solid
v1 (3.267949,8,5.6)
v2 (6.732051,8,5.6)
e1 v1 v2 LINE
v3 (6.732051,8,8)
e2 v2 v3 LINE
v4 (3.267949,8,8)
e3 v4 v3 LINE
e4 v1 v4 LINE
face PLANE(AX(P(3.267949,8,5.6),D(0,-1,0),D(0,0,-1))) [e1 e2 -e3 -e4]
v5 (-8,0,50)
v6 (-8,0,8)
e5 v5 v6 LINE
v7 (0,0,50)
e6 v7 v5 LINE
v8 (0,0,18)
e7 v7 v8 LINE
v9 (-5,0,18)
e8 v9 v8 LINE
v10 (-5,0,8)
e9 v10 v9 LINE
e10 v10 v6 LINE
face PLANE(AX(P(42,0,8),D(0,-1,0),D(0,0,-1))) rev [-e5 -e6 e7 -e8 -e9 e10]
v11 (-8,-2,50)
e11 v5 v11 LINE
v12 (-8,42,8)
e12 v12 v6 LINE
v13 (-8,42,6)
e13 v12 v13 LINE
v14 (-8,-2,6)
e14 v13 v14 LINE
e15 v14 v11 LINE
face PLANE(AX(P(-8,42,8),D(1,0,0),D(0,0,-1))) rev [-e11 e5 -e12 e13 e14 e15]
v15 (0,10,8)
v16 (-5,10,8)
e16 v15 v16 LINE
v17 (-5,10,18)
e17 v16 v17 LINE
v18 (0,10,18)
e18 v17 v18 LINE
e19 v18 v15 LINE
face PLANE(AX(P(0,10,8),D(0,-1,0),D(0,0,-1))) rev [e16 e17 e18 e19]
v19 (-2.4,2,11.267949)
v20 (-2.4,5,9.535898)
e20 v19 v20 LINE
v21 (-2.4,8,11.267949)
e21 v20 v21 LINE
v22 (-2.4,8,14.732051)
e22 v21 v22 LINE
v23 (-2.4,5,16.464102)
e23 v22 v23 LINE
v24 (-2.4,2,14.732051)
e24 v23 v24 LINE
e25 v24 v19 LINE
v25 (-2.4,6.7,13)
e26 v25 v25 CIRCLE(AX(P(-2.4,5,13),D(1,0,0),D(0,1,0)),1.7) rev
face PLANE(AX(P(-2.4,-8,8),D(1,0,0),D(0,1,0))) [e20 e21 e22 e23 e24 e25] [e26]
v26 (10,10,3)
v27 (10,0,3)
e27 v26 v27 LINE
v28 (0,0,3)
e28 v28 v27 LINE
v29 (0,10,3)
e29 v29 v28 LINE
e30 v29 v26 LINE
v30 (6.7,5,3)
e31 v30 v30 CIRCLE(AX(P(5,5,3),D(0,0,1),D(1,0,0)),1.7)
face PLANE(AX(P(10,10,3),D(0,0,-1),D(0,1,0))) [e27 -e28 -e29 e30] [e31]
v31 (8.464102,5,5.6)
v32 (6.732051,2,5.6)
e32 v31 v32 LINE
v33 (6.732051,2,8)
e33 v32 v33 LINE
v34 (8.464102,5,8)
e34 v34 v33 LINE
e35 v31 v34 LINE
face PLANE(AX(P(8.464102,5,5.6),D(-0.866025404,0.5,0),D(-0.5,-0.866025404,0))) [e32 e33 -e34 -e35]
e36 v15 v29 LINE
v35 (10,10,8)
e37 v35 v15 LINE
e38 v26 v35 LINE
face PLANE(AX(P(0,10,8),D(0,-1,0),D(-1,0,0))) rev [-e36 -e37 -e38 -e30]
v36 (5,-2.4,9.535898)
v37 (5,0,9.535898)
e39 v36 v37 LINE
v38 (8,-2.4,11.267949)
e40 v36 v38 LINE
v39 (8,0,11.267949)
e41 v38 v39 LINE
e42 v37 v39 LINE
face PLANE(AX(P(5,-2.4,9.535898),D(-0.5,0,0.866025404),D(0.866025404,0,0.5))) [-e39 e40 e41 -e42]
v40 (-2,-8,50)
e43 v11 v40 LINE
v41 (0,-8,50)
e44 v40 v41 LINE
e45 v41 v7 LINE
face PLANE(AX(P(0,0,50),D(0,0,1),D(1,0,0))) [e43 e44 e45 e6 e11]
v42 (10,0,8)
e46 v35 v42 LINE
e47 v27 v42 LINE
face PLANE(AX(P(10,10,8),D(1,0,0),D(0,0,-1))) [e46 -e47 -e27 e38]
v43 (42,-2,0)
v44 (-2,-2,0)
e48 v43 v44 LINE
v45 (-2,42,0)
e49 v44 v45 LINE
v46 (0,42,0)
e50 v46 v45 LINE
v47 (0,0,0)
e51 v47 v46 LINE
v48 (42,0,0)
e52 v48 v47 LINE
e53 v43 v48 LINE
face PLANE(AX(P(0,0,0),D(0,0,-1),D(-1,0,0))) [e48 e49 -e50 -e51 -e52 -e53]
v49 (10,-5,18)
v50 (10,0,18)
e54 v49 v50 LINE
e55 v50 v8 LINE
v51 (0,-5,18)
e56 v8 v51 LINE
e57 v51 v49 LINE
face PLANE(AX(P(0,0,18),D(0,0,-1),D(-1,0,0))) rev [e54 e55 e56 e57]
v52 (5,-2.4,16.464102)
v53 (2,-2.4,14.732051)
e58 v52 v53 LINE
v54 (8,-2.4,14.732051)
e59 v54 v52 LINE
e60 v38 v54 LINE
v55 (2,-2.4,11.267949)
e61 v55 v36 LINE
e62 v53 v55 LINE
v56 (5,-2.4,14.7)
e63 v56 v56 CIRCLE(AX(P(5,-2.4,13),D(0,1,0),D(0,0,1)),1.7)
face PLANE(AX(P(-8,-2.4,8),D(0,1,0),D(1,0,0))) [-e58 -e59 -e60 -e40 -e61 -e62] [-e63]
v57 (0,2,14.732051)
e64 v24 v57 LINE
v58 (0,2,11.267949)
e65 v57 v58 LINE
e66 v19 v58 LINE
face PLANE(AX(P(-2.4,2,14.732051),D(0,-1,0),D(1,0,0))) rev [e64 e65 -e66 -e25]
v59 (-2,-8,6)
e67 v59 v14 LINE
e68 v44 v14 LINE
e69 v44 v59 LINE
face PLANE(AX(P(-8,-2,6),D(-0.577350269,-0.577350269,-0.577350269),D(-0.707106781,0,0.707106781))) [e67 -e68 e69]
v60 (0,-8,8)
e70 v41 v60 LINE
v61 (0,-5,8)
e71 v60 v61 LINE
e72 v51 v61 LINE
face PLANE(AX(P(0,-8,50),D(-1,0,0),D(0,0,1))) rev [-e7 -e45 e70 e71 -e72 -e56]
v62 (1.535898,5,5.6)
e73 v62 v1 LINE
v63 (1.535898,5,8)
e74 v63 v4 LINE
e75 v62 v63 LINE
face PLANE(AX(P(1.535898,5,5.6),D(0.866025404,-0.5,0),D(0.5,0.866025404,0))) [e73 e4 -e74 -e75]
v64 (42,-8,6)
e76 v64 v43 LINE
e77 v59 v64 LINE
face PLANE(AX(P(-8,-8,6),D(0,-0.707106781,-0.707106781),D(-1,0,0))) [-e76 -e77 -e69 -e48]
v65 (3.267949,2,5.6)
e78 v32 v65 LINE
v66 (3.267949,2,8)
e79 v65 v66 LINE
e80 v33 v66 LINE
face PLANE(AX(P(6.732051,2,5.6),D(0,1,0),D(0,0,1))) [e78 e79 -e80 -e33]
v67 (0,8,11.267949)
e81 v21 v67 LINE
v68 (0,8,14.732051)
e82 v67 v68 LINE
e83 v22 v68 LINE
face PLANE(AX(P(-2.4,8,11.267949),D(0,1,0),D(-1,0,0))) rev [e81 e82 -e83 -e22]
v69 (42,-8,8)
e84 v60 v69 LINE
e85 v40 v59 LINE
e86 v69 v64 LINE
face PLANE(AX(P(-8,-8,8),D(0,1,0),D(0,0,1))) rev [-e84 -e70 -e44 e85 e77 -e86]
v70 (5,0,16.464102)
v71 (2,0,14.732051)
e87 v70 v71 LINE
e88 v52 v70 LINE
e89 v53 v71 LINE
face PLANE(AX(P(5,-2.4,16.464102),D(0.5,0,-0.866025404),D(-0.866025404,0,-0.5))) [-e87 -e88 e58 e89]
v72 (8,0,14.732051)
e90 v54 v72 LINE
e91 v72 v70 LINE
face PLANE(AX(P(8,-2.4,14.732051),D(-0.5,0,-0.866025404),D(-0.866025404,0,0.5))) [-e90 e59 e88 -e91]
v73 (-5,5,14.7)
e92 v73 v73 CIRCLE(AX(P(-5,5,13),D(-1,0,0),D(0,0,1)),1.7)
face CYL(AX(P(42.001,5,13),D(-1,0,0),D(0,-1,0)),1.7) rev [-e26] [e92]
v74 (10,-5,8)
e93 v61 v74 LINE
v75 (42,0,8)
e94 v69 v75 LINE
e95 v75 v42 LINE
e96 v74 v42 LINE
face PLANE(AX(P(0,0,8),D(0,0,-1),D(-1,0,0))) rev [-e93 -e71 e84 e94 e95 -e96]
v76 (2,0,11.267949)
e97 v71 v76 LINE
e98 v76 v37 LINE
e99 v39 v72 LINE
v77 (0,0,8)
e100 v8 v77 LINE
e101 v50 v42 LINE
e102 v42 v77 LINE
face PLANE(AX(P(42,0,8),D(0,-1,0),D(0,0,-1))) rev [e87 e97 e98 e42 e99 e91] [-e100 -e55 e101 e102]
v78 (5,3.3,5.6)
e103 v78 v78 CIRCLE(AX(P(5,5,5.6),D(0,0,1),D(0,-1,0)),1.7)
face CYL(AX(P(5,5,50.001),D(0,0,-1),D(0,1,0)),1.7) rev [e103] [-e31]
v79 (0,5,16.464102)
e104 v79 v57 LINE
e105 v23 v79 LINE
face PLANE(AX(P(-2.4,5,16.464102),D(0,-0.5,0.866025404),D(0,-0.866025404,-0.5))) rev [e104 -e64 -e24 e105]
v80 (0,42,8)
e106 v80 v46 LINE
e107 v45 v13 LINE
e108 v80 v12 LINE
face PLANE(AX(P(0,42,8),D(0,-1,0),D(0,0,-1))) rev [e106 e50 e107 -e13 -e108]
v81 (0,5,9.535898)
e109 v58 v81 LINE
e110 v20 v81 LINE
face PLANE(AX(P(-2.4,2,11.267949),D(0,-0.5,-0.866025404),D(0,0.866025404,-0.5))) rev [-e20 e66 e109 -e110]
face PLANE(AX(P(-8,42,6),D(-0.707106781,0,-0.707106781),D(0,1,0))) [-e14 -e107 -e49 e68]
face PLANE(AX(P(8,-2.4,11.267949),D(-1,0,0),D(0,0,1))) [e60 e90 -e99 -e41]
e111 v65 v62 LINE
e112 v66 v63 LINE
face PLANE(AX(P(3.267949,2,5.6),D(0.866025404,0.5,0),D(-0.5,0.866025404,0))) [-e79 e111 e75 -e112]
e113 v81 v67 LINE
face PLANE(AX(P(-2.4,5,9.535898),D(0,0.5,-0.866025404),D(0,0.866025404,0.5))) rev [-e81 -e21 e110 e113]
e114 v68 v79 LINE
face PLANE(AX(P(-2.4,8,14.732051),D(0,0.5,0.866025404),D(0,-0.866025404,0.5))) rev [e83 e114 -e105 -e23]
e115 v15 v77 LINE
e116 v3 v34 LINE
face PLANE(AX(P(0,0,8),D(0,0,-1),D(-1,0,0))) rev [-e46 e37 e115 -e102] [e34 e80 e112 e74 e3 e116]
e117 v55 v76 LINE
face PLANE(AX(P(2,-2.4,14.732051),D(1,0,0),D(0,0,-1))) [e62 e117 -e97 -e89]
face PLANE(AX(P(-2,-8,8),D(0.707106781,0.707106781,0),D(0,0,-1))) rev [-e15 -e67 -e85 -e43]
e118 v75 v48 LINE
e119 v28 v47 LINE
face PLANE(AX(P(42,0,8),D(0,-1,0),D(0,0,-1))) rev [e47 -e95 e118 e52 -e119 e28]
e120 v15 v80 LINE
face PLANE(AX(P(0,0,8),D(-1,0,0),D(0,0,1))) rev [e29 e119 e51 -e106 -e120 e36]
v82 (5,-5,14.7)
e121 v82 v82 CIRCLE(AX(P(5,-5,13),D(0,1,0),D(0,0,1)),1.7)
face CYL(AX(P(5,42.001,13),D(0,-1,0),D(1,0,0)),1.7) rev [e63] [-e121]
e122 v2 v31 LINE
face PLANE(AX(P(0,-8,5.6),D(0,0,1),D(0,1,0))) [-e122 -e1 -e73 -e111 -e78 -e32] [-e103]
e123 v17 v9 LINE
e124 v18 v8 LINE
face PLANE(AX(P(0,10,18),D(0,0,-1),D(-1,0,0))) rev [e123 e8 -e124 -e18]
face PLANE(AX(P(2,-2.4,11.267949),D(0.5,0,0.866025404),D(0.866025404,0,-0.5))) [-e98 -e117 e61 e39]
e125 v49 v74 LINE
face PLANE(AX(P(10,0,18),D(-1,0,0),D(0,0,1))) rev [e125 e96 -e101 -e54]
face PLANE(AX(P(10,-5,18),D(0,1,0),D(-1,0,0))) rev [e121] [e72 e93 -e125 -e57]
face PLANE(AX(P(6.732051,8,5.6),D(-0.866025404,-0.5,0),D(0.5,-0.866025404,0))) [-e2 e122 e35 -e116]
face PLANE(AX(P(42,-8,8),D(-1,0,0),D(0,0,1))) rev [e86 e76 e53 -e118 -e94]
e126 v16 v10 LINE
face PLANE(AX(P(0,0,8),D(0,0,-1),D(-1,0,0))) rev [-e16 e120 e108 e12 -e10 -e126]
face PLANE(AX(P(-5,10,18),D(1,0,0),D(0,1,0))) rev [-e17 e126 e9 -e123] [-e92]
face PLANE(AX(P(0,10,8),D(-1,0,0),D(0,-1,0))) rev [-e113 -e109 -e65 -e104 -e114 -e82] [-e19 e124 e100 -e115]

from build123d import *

# Parameters (mm, degrees)
BOSS_EXTRUDE1_DEPTH     = 8
SKETCH2_W               = 8
SKETCH2_H               = 8
BOSS_EXTRUDE2_DEPTH     = 42
SKETCH3_W               = 10
SKETCH3_H               = 5
BOSS_EXTRUDE3_DEPTH     = 10
CUT_EXTRUDE1_REACH      = 82.455
SKETCH4_R               = 1.7
CUT_EXTRUDE2_DEPTH      = 2.4
CHAMFER1_SIZE           = 6
MIRROR2_COPY_1_SKETCH_W = 10
MIRROR2_COPY_1_SKETCH_H = 5
MIRROR2_COPY_1_DEPTH    = 10
MIRROR2_COPY_2_REACH    = 82.455
MIRROR2_COPY_2_SKETCH_R = 1.7
MIRROR2_COPY_3_DEPTH    = 2.4
MIRROR2_COPY_4_SKETCH_W = 10
MIRROR2_COPY_4_SKETCH_H = 5
MIRROR2_COPY_4_DEPTH    = 10
MIRROR2_COPY_5_REACH    = 82.455
MIRROR2_COPY_5_SKETCH_R = 1.7
MIRROR2_COPY_6_DEPTH    = 2.4


with BuildPart() as part:
    # Sketch1 → Boss-Extrude1 (new body)
    with BuildSketch(Plane.XY):
        Polygon((0, 0), (0, 42), (-8, 42), (-8, -8), (42, -8), (42, 0), align=None)
    extrude(amount=BOSS_EXTRUDE1_DEPTH)

    # Sketch2 → Boss-Extrude2 (add)
    with BuildSketch(Plane.XY.offset(8)):
        with Locations((-4, -4)):
            Rectangle(SKETCH2_W, SKETCH2_H)
    extrude(amount=BOSS_EXTRUDE2_DEPTH)

    # Sketch3 → Boss-Extrude3 (add)
    with BuildSketch(Plane.XY.offset(8)):
        with Locations((5, -2.5)):
            Rectangle(SKETCH3_W, SKETCH3_H)
    boss_extrude3 = extrude(amount=BOSS_EXTRUDE3_DEPTH)

    # Sketch4 → Cut-Extrude1 (cut, up to next)
    with BuildSketch(Plane.XZ.offset(5), mode=Mode.PRIVATE) as cut_extrude1_sk1:
        with Locations((5, 13)):
            Circle(SKETCH4_R)
    cut_extrude1_tool1 = extrude(cut_extrude1_sk1.sketch, amount=-CUT_EXTRUDE1_REACH, mode=Mode.PRIVATE) & part.part
    cut_extrude1 = cut_extrude1_tool1.solids().sort_by_distance((5, -5, 13))[0]
    add(cut_extrude1, mode=Mode.SUBTRACT)

    # Sketch5 → Cut-Extrude2 (cut)
    with BuildSketch(Plane(origin=(0, 0, 0), x_dir=(1, 0, 0), z_dir=(0, 1, 0))):
        Polygon((8.464101615, -13), (6.732050808, -10), (3.267949192, -10), (1.535898385, -13), (3.267949192, -16), (6.732050808, -16), align=None)
    cut_extrude2 = extrude(amount=-CUT_EXTRUDE2_DEPTH, mode=Mode.SUBTRACT)

    # Mirror1: Boss-Extrude3, Cut-Extrude1, Cut-Extrude2 across plane
    add(boss_extrude3.mirror(Plane(origin=(0, -4, 4), x_dir=(0, 0.7071067811865489, 0.7071067811865462), z_dir=(0, 0.7071067811865464, -0.7071067811865488))))
    add(cut_extrude1.mirror(Plane(origin=(0, -4, 4), x_dir=(0, 0.7071067811865489, 0.7071067811865462), z_dir=(0, 0.7071067811865464, -0.7071067811865488))), mode=Mode.SUBTRACT)
    add(cut_extrude2.mirror(Plane(origin=(0, -4, 4), x_dir=(0, 0.7071067811865489, 0.7071067811865462), z_dir=(0, 0.7071067811865464, -0.7071067811865488))), mode=Mode.SUBTRACT)

    # Chamfer1
    chamfer1_edges = [part.edges().sort_by_distance(p)[0] for p in [
        (-8, 17, 0),
        (-8, -8, 25),
        (17, -8, 0),
    ]]
    chamfer(chamfer1_edges, length=CHAMFER1_SIZE)

    # Mirror2 copy 1 sketch → Mirror2 copy 1 (add)
    with BuildSketch(Plane(origin=(0, 0, 8), x_dir=(0, 0, 1), z_dir=(0, 1, 0))):
        with Locations((5, -2.5)):
            Rectangle(MIRROR2_COPY_1_SKETCH_W, MIRROR2_COPY_1_SKETCH_H)
    extrude(amount=MIRROR2_COPY_1_DEPTH)

    # Mirror2 copy 2 sketch → Mirror2 copy 2 (cut, up to next)
    with BuildSketch(Plane(origin=(-5, -8, 8), x_dir=(0, 0, 1), z_dir=(-1, 0, 0)), mode=Mode.PRIVATE) as mirror2_copy_2_sk1:
        with Locations((5, 13)):
            Circle(MIRROR2_COPY_2_SKETCH_R)
    mirror2_copy_2_tool1 = extrude(mirror2_copy_2_sk1.sketch, amount=-MIRROR2_COPY_2_REACH, mode=Mode.PRIVATE) & part.part
    add(mirror2_copy_2_tool1.solids().sort_by_distance((-5, 5, 13))[0], mode=Mode.SUBTRACT)

    # Mirror2 copy 3 sketch → Mirror2 copy 3 (cut)
    with BuildSketch(Plane(origin=(0, -8, 8), x_dir=(0, 0, 1), z_dir=(1, 0, 0))):
        Polygon((8.464101615, -13), (6.732050808, -10), (3.267949192, -10), (1.535898385, -13), (3.267949192, -16), (6.732050808, -16), align=None)
    extrude(amount=-MIRROR2_COPY_3_DEPTH, mode=Mode.SUBTRACT)

    # Mirror2 copy 4 sketch → Mirror2 copy 4 (add)
    with BuildSketch(Plane(origin=(0, 0, 8), x_dir=(0, 0, 1), z_dir=(1, 0, 0))):
        with Locations((5, 2.5)):
            Rectangle(MIRROR2_COPY_4_SKETCH_W, MIRROR2_COPY_4_SKETCH_H)
    extrude(amount=MIRROR2_COPY_4_DEPTH)

    # Mirror2 copy 5 sketch → Mirror2 copy 5 (cut, up to next)
    with BuildSketch(Plane(origin=(-8, -5, 8), x_dir=(0, 0, 1), z_dir=(0, -1, 0)), mode=Mode.PRIVATE) as mirror2_copy_5_sk1:
        with Locations((5, -13)):
            Circle(MIRROR2_COPY_5_SKETCH_R)
    mirror2_copy_5_tool1 = extrude(mirror2_copy_5_sk1.sketch, amount=-MIRROR2_COPY_5_REACH, mode=Mode.PRIVATE) & part.part
    add(mirror2_copy_5_tool1.solids().sort_by_distance((5, -5, 13))[0], mode=Mode.SUBTRACT)

    # Mirror2 copy 6 sketch → Mirror2 copy 6 (cut)
    with BuildSketch(Plane(origin=(-8, 0, 8), x_dir=(0, 0, 1), z_dir=(0, 1, 0))):
        Polygon((8.464101615, 13), (6.732050808, 10), (3.267949192, 10), (1.535898385, 13), (3.267949192, 16), (6.732050808, 16), align=None)
    extrude(amount=-MIRROR2_COPY_6_DEPTH, mode=Mode.SUBTRACT)


solid = part.part
